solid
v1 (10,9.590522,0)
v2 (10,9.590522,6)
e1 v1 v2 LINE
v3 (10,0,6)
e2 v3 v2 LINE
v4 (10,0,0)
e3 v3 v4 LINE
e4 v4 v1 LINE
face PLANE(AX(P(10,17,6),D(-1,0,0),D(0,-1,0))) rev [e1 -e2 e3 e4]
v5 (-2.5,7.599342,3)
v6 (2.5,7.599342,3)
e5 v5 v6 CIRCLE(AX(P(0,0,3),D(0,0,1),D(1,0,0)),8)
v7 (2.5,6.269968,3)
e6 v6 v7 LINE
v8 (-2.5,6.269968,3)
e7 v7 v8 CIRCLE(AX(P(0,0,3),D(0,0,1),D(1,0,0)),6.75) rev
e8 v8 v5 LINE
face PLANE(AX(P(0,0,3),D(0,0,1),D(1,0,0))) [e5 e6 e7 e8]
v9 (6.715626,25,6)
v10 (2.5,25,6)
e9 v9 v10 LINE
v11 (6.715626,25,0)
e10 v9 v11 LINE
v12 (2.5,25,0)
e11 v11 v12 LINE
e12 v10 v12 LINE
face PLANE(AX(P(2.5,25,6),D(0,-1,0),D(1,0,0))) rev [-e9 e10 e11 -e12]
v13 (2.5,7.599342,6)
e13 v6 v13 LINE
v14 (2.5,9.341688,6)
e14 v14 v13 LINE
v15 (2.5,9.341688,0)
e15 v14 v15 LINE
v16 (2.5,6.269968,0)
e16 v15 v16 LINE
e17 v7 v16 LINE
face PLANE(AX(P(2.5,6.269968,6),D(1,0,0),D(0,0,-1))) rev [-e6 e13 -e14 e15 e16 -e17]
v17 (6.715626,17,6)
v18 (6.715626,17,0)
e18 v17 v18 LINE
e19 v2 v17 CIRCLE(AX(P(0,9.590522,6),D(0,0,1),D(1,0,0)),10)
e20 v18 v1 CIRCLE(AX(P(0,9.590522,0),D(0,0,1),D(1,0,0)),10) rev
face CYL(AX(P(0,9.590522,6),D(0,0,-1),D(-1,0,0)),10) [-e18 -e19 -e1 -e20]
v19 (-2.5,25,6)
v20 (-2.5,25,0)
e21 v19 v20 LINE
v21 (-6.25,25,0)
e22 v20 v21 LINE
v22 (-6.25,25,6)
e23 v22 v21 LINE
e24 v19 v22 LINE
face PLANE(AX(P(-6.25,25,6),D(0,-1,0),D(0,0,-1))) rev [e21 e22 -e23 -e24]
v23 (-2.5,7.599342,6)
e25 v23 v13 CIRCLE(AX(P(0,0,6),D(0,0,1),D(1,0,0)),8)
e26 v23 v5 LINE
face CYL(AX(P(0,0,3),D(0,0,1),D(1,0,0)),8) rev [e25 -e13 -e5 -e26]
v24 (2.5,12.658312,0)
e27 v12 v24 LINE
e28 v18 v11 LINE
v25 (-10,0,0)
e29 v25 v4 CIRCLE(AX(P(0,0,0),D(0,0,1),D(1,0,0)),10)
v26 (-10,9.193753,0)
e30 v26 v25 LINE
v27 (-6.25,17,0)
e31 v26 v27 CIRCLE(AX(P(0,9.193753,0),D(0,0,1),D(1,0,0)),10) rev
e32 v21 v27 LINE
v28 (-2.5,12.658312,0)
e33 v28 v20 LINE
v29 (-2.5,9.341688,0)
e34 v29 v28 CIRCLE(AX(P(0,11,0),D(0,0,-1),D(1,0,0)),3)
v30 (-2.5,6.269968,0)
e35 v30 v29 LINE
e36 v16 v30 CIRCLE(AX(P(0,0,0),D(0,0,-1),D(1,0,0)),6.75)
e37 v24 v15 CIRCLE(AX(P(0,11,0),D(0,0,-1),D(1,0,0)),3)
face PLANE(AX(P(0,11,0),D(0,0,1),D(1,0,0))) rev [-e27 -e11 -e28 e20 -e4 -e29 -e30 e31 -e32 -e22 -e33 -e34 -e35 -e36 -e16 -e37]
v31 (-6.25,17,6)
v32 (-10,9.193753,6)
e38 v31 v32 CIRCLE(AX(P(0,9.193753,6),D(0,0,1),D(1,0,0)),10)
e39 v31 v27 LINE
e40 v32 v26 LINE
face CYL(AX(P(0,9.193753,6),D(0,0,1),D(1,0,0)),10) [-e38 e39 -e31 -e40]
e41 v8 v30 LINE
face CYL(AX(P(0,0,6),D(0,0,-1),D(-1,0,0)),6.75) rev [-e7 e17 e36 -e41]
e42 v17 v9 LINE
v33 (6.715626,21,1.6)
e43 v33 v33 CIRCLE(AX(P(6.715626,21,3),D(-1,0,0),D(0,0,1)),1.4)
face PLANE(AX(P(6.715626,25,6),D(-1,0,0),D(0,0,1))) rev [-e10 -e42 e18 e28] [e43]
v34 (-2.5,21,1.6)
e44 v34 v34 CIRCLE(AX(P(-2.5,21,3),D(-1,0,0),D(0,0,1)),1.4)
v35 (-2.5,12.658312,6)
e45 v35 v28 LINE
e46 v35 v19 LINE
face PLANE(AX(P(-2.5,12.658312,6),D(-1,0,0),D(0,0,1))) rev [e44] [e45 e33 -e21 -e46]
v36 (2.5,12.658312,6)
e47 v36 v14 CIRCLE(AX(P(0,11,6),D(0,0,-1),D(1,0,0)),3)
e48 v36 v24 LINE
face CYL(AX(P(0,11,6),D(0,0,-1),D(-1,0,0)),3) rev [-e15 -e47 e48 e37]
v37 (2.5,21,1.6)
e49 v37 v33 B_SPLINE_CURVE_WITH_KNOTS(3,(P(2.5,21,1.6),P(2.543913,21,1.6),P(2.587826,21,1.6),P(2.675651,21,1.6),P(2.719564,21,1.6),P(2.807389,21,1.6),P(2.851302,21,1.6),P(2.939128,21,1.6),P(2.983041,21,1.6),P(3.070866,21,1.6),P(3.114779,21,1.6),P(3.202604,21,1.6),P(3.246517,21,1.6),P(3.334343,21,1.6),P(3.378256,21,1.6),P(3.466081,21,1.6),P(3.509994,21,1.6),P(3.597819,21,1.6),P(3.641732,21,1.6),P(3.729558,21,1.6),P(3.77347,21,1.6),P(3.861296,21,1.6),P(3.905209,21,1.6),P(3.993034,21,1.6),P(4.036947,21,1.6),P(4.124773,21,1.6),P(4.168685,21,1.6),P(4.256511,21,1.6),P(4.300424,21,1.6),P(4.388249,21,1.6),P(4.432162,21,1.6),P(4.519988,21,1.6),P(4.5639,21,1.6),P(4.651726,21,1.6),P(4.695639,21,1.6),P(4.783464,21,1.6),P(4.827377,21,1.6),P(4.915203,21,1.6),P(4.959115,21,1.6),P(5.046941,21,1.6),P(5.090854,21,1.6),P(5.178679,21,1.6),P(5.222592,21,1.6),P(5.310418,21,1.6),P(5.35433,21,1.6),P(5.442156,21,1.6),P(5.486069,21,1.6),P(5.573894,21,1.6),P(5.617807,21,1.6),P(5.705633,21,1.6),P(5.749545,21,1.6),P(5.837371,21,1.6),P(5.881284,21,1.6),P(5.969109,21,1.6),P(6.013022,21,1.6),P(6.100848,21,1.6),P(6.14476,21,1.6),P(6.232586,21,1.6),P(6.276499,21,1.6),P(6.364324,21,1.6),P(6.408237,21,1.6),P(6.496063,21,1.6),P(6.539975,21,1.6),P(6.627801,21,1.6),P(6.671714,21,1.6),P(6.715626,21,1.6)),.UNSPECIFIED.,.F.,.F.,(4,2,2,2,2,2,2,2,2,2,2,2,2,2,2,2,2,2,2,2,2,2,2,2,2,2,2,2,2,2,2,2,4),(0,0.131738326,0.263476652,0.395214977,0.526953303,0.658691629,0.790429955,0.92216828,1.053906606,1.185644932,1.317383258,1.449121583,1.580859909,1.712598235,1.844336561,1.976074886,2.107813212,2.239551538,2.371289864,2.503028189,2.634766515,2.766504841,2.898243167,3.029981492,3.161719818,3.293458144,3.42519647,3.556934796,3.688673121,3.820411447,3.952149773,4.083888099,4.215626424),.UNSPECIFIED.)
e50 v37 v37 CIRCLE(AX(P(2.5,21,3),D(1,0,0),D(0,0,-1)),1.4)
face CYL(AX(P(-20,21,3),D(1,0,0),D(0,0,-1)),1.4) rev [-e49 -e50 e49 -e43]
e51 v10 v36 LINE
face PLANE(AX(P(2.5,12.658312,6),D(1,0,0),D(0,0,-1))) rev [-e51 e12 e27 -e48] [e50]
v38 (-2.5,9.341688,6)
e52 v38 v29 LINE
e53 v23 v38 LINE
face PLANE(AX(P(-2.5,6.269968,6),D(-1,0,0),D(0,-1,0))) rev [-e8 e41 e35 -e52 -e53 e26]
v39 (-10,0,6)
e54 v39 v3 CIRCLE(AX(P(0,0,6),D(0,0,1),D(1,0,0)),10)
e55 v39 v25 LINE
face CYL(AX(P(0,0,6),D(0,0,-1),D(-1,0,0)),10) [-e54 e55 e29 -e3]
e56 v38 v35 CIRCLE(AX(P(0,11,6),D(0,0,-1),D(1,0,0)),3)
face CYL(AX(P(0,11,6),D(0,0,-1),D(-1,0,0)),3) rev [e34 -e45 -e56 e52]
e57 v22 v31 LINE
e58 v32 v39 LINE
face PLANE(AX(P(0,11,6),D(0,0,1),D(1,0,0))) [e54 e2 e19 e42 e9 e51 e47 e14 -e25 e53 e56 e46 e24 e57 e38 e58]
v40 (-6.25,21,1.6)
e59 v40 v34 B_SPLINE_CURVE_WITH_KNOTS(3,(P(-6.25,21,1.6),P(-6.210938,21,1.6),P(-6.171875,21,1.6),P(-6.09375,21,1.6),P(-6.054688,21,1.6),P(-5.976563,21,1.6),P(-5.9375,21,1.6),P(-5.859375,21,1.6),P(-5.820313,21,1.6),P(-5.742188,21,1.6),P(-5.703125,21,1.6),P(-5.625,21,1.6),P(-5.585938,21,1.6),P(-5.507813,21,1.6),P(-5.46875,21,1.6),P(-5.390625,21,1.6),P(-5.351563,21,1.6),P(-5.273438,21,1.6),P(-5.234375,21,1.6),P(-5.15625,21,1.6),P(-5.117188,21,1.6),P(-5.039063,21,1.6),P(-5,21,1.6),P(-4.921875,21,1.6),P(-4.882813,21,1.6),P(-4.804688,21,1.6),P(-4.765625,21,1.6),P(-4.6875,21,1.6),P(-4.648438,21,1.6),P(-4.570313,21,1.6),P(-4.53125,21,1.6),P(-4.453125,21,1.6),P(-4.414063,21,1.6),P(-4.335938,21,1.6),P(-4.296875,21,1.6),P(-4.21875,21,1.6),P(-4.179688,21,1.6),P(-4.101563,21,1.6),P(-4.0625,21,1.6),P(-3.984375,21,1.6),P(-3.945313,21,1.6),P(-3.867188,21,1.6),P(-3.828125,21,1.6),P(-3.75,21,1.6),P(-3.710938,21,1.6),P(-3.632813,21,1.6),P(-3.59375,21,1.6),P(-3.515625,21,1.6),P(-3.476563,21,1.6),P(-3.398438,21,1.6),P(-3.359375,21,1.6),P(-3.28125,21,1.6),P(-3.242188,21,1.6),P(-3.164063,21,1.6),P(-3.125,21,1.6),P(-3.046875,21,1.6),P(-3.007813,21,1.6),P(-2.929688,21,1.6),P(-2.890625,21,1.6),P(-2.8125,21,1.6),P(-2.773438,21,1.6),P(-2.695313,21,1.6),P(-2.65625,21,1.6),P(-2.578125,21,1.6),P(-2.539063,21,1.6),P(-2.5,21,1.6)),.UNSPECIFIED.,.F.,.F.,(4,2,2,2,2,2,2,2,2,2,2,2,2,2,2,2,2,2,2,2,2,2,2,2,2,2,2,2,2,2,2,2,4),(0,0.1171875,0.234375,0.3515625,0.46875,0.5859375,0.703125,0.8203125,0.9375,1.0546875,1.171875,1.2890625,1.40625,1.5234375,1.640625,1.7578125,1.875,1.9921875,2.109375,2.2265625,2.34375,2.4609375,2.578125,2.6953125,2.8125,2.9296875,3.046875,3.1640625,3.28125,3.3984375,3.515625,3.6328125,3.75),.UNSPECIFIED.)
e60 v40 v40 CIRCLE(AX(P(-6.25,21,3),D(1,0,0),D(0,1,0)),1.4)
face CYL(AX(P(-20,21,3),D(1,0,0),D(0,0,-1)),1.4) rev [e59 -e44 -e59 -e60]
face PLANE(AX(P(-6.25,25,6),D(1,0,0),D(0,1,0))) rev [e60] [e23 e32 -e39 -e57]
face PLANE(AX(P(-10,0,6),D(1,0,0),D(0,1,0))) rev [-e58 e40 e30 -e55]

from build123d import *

# Parameters (mm, degrees)
BOSS_EXTRUDE1_DEPTH = 6
SKETCH2_R           = 1.4
CUT_EXTRUDE1_DEPTH  = 30
SKETCH3_R           = 8
CUT_EXTRUDE2_DEPTH  = 3
FILLET1_R           = 10
FILLET2_R           = 10


with BuildPart() as part:
    # Sketch1 → Boss-Extrude1 (new body)
    with BuildSketch(Plane(origin=(0, 0, 0), x_dir=(0, 1, 0), z_dir=(0, 0, 1))):
        with BuildLine():
            Line((6.269968102, 2.5), (9.341687605, 2.5))
            ThreePointArc((9.341687605, 2.5), (11, 3), (12.658312395, 2.5))
            Line((12.658312395, 2.5), (25, 2.5))
            Line((25, 2.5), (25, 6.25))
            Line((25, 6.25), (17, 6.25))
            Line((17, 6.25), (17, 10))
            Line((17, 10), (0, 10))
            ThreePointArc((0, 10), (-10, 0), (0, -10))
            Line((0, -10), (17, -10))
            Line((17, -10), (17, -6.715626424))
            Line((17, -6.715626424), (25, -6.715626424))
            Line((25, -6.715626424), (25, -2.5))
            Line((25, -2.5), (12.658312395, -2.5))
            ThreePointArc((12.658312395, -2.5), (11, -3), (9.341687605, -2.5))
            Line((9.341687605, -2.5), (6.269968102, -2.5))
            ThreePointArc((6.269968102, -2.5), (-6.75, 0), (6.269968102, 2.5))
        make_face()
    extrude(amount=BOSS_EXTRUDE1_DEPTH)

    # Sketch2 → Cut-Extrude1 (cut)
    with BuildSketch(Plane.YZ.offset(10)):
        with Locations(Location((21, 3, 0), (0, 0, 270))):
            Circle(SKETCH2_R)
    extrude(amount=-CUT_EXTRUDE1_DEPTH, mode=Mode.SUBTRACT)

    # Sketch3 → Cut-Extrude2 (cut)
    with BuildSketch(Plane.XY.offset(6)):
        Circle(SKETCH3_R)
    extrude(amount=-CUT_EXTRUDE2_DEPTH, mode=Mode.SUBTRACT)

    # Fillet1
    # the kernel refuses this fillet: 10 mm, written as the material it takes off along each edge
    with BuildSketch(Plane(origin=(10, 17, -18.523694578), x_dir=(-1, 0, 0), z_dir=(0, 0, 1))) as fillet1_piece_1:
        with BuildLine():
            CenterArc((10, 7.409477831), FILLET1_R, 180, 47.812214848)
            Line((0, 7.409477831), (-0.2, 7.409477831))
            Line((-0.2, 7.409477831), (-0.2, 0))
            Line((-0.2, 0), (0, -0.2))
            ThreePointArc((0, -0.2), (1.642186788, -0.2), (3.150061047, -0.148189557))
            Line((3.150061047, -0.148189557), (3.284373576, 0))
        make_face()
    extrude(amount=43.047389155, mode=Mode.SUBTRACT)

    # Fillet2
    # the kernel refuses this fillet: 10 mm, written as the material it takes off along each edge
    with BuildSketch(Plane(origin=(-10, 17, -19.515618745), x_dir=(0, -1, 0), z_dir=(0, 0, 1))) as fillet2_piece_1:
        with BuildLine():
            CenterArc((7.806247498, 10), FILLET2_R, 218.682187453, 51.317812547)
            Line((0, 3.75), (-0.15612495, 3.625))
            ThreePointArc((-0.15612495, 3.625), (-0.2, 1.875), (-0.2, 0))
            Line((-0.2, 0), (0, -0.2))
            Line((0, -0.2), (7.806247498, -0.2))
            Line((7.806247498, -0.2), (7.806247498, 0))
        make_face()
    extrude(amount=45.03123749, mode=Mode.SUBTRACT)


solid = part.part
